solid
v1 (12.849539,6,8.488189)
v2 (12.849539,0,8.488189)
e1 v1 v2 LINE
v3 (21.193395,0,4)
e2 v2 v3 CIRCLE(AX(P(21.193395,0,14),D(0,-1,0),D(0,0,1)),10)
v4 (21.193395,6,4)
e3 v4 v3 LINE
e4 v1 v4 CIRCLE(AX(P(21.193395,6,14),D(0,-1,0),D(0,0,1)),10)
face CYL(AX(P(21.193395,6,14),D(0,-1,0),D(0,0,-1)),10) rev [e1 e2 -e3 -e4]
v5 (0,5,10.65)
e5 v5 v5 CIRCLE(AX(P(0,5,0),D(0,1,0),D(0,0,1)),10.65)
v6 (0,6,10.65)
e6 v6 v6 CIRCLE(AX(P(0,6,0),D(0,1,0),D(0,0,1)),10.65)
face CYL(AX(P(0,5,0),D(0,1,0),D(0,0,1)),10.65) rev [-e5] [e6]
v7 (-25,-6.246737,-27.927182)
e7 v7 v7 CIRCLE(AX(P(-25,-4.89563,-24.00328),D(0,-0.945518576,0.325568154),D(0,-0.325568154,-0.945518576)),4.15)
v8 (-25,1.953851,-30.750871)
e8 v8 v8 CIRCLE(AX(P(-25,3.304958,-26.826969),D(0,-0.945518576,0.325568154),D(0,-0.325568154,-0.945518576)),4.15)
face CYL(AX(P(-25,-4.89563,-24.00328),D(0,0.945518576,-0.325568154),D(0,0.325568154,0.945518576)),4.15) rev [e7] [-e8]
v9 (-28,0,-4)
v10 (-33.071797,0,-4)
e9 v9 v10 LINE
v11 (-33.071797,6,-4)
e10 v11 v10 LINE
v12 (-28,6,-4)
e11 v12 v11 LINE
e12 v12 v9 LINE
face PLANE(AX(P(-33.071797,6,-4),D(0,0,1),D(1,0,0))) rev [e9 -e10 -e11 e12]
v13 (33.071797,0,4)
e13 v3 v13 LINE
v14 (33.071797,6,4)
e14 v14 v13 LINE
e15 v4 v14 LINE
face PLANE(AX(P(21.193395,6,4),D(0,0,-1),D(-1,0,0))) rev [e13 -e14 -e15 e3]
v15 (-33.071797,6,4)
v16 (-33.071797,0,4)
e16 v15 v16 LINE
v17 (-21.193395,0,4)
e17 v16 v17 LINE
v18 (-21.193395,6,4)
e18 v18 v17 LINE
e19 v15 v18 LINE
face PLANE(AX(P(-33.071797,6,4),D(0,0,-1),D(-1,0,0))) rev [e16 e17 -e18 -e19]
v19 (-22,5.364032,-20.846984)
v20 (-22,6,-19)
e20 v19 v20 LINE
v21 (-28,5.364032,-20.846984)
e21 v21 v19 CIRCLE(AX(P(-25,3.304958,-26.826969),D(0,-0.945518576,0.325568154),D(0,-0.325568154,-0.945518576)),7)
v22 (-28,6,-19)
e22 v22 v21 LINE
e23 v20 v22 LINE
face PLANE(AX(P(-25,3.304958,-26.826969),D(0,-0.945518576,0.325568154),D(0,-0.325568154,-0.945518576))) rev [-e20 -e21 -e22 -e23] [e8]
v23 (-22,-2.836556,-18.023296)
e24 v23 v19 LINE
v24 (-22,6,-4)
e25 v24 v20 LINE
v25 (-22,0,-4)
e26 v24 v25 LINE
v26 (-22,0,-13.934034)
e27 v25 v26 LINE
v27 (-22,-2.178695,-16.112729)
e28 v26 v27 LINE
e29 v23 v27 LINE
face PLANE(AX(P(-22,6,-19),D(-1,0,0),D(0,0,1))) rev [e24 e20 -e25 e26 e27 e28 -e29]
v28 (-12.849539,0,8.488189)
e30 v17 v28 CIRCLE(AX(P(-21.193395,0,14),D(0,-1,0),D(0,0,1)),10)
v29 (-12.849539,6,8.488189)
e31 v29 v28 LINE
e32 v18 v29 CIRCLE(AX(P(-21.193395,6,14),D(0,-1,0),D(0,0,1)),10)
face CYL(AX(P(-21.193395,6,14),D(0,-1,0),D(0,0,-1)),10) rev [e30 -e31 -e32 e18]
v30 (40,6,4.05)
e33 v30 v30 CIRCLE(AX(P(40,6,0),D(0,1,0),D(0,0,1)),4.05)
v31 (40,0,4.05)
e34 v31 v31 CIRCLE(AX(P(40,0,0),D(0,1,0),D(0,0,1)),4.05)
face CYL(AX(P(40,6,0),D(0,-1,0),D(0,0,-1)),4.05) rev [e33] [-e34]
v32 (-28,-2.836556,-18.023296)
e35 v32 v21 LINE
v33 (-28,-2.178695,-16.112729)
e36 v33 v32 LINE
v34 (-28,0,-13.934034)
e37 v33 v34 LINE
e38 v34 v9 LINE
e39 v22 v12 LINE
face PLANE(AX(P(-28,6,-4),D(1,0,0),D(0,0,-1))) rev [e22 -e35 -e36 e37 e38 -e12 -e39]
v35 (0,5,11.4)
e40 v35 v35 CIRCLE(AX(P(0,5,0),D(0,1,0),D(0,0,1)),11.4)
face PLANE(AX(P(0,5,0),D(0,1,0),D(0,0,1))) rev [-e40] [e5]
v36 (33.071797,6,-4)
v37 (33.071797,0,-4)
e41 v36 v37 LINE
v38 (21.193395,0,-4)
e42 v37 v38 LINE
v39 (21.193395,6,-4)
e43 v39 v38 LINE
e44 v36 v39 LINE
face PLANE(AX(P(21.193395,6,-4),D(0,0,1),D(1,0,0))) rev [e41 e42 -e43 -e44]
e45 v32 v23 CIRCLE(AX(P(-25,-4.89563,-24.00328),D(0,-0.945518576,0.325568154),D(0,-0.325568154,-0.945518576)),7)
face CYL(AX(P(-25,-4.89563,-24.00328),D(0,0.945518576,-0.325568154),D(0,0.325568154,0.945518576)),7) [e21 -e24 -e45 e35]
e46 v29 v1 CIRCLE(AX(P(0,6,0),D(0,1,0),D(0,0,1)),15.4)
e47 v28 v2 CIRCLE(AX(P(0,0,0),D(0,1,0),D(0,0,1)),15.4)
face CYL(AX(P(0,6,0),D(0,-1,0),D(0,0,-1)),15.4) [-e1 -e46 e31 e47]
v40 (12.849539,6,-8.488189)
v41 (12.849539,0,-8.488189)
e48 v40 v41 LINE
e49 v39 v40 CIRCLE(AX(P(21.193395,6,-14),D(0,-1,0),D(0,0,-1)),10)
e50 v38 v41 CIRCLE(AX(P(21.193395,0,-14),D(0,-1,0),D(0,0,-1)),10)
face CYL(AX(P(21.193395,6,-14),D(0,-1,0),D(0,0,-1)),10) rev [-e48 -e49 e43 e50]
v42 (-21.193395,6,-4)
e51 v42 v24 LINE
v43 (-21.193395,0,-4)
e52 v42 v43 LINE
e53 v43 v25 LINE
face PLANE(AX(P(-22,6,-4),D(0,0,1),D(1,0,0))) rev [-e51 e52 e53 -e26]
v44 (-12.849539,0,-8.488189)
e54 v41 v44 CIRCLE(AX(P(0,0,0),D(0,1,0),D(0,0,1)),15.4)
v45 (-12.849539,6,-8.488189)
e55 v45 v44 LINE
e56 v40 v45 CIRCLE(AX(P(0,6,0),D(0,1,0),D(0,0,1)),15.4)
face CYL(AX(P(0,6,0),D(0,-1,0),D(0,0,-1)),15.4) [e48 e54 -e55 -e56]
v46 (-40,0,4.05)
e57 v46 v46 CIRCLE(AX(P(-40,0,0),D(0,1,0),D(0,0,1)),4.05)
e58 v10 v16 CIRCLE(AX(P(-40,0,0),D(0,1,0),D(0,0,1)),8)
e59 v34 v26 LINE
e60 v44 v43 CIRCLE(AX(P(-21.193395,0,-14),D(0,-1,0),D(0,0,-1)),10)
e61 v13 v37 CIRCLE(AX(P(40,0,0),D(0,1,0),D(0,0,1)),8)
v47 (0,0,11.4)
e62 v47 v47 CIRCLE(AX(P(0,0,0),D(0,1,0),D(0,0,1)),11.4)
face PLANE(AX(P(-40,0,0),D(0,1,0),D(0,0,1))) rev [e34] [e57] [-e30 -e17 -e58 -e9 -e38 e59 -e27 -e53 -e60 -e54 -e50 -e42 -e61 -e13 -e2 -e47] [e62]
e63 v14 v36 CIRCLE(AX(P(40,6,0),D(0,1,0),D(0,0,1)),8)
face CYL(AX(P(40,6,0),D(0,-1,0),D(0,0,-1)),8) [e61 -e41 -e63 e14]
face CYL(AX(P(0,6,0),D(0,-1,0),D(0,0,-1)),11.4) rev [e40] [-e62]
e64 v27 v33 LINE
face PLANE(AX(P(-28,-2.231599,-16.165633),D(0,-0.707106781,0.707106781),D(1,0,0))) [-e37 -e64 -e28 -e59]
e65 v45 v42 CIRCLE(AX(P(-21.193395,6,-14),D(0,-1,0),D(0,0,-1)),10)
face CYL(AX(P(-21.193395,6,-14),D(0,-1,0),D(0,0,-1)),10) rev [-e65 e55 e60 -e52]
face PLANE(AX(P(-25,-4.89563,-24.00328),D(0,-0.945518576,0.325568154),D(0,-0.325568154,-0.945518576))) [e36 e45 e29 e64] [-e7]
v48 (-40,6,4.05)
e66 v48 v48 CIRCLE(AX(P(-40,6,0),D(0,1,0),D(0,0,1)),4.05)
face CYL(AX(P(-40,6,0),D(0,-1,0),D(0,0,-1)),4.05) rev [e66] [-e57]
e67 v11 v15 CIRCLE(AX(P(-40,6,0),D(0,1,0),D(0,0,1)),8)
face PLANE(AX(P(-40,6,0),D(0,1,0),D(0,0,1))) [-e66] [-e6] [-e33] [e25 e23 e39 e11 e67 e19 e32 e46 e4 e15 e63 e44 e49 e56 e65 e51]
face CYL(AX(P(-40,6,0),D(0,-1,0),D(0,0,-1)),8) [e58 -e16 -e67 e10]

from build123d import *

# Parameters (mm, degrees)
ESBO_O1_R                     = 4.05
ESBO_O1_R_2                   = 11.4
RESSALTO_EXTRUS_O1_DEPTH      = 6
RESSALTO_EXTRUS_O2_START      = -1
ESBO_O2_R                     = 11.4
ESBO_O2_R_2                   = 10.65
RESSALTO_EXTRUS_O2_DEPTH      = 1
RESSALTO_EXTRUS_O4_DEPTH      = 3
RESSALTO_EXTRUS_O4_DEPTH_BACK = 5.673111
ESBO_O4_R                     = 4.15
CHANFRO1_SIZE                 = 2.360185131
CHANFRO1_SIZE_2               = 3


with BuildPart() as part:
    # Esboço1 → Ressalto-extrusão1 (new body)
    with BuildSketch(Plane(origin=(0, 0, 0), x_dir=(1, 0, 0), z_dir=(0, 1, 0))):
        with BuildLine():
            Line((-33.07179677, 4), (-28, 4))
            Line((-28, 4), (-28, 19))
            Line((-28, 19), (-22, 19))
            Line((-22, 19), (-22, 4))
            Line((-22, 4), (-21.193395198, 4))
            ThreePointArc((-21.193395198, 4), (-16.456207753, 5.193238103), (-12.849538821, 8.488188976))
            ThreePointArc((-12.849538821, 8.488188976), (0, 15.4), (12.849538821, 8.488188976))
            ThreePointArc((12.849538821, 8.488188976), (16.456207753, 5.193238103), (21.193395198, 4))
            Line((21.193395198, 4), (33.07179677, 4))
            ThreePointArc((33.07179677, 4), (48, 0), (33.07179677, -4))
            Line((33.07179677, -4), (21.193395198, -4))
            ThreePointArc((21.193395198, -4), (16.456207753, -5.193238103), (12.849538821, -8.488188976))
            ThreePointArc((12.849538821, -8.488188976), (0, -15.4), (-12.849538821, -8.488188976))
            ThreePointArc((-12.849538821, -8.488188976), (-16.456207753, -5.193238103), (-21.193395198, -4))
            Line((-21.193395198, -4), (-33.07179677, -4))
            ThreePointArc((-33.07179677, -4), (-48, 0), (-33.07179677, 4))
        make_face()
        with Locations(Location((40, 0, 0), (0, 0, 270))):
            Circle(ESBO_O1_R, mode=Mode.SUBTRACT)
        with Locations(Location((-40, 0, 0), (0, 0, 270))):
            Circle(ESBO_O1_R, mode=Mode.SUBTRACT)
        with Locations(Location((0, 0, 0), (0, 0, 270))):
            Circle(ESBO_O1_R_2, mode=Mode.SUBTRACT)
    extrude(amount=RESSALTO_EXTRUS_O1_DEPTH)

    # Esboço2 → Ressalto-extrusão2 (add)
    with BuildSketch(Plane(origin=(0, 6, 0), x_dir=(1, 0, 0), z_dir=(0, 1, 0)).offset(RESSALTO_EXTRUS_O2_START)):
        with Locations(Location((0, 0, 0), (0, 0, 270))):
            Circle(ESBO_O2_R)
        with Locations(Location((0, 0, 0), (0, 0, 270))):
            Circle(ESBO_O2_R_2, mode=Mode.SUBTRACT)
    extrude(amount=RESSALTO_EXTRUS_O2_DEPTH)

    # Esboço4 → Ressalto-extrusão4 (add, two sides: drawn at the far end of the back side and taken through both)
    with BuildSketch(Plane(origin=(0, 5.848784016, -2.013897841), x_dir=(-1, 0, 0), z_dir=(0, -0.9455185755993178, 0.32556815445715404)).offset(-RESSALTO_EXTRUS_O4_DEPTH_BACK)):
        with BuildLine():
            Line((28, 16.01144401), (22, 16.01144401))
            Line((22, 16.01144401), (22, 17.964852936))
            ThreePointArc((22, 17.964852936), (25, 31.289408257), (28, 17.964852936))
            Line((28, 17.964852936), (28, 16.01144401))
        make_face()
        with Locations(Location((25, 24.289408257, 0), (0, 0, 90))):
            Circle(ESBO_O4_R, mode=Mode.SUBTRACT)
    extrude(amount=RESSALTO_EXTRUS_O4_DEPTH + RESSALTO_EXTRUS_O4_DEPTH_BACK)

    # Chanfro1
    # the kernel refuses this chamfer: 3, 2.360185131 mm, written as the material it adds along each edge
    with BuildSketch(Plane(origin=(-22, 0, -16.93403432), x_dir=(0, -0.9591141724296175, 0.28301944146056485), z_dir=(-1, 0, 0))) as chanfro1_piece_1_section:
        Polygon((CHANFRO1_SIZE * 0.999002383221, CHANFRO1_SIZE * 0.0446568918676), (CHANFRO1_SIZE_2 * 0.283019441461, CHANFRO1_SIZE_2 * 0.95911417243), (0, 0), align=None)
    chanfro1_piece_1 = extrude(amount=6, mode=Mode.PRIVATE)
    chanfro1_piece_1 = split(chanfro1_piece_1, bisect_by=Plane(origin=(-25, -1.892415704, -15.281313813), z_dir=(0, 0.9455185755993178, -0.32556815445715404)), keep=Keep.TOP, mode=Mode.PRIVATE)
    add(chanfro1_piece_1)


solid = part.part
